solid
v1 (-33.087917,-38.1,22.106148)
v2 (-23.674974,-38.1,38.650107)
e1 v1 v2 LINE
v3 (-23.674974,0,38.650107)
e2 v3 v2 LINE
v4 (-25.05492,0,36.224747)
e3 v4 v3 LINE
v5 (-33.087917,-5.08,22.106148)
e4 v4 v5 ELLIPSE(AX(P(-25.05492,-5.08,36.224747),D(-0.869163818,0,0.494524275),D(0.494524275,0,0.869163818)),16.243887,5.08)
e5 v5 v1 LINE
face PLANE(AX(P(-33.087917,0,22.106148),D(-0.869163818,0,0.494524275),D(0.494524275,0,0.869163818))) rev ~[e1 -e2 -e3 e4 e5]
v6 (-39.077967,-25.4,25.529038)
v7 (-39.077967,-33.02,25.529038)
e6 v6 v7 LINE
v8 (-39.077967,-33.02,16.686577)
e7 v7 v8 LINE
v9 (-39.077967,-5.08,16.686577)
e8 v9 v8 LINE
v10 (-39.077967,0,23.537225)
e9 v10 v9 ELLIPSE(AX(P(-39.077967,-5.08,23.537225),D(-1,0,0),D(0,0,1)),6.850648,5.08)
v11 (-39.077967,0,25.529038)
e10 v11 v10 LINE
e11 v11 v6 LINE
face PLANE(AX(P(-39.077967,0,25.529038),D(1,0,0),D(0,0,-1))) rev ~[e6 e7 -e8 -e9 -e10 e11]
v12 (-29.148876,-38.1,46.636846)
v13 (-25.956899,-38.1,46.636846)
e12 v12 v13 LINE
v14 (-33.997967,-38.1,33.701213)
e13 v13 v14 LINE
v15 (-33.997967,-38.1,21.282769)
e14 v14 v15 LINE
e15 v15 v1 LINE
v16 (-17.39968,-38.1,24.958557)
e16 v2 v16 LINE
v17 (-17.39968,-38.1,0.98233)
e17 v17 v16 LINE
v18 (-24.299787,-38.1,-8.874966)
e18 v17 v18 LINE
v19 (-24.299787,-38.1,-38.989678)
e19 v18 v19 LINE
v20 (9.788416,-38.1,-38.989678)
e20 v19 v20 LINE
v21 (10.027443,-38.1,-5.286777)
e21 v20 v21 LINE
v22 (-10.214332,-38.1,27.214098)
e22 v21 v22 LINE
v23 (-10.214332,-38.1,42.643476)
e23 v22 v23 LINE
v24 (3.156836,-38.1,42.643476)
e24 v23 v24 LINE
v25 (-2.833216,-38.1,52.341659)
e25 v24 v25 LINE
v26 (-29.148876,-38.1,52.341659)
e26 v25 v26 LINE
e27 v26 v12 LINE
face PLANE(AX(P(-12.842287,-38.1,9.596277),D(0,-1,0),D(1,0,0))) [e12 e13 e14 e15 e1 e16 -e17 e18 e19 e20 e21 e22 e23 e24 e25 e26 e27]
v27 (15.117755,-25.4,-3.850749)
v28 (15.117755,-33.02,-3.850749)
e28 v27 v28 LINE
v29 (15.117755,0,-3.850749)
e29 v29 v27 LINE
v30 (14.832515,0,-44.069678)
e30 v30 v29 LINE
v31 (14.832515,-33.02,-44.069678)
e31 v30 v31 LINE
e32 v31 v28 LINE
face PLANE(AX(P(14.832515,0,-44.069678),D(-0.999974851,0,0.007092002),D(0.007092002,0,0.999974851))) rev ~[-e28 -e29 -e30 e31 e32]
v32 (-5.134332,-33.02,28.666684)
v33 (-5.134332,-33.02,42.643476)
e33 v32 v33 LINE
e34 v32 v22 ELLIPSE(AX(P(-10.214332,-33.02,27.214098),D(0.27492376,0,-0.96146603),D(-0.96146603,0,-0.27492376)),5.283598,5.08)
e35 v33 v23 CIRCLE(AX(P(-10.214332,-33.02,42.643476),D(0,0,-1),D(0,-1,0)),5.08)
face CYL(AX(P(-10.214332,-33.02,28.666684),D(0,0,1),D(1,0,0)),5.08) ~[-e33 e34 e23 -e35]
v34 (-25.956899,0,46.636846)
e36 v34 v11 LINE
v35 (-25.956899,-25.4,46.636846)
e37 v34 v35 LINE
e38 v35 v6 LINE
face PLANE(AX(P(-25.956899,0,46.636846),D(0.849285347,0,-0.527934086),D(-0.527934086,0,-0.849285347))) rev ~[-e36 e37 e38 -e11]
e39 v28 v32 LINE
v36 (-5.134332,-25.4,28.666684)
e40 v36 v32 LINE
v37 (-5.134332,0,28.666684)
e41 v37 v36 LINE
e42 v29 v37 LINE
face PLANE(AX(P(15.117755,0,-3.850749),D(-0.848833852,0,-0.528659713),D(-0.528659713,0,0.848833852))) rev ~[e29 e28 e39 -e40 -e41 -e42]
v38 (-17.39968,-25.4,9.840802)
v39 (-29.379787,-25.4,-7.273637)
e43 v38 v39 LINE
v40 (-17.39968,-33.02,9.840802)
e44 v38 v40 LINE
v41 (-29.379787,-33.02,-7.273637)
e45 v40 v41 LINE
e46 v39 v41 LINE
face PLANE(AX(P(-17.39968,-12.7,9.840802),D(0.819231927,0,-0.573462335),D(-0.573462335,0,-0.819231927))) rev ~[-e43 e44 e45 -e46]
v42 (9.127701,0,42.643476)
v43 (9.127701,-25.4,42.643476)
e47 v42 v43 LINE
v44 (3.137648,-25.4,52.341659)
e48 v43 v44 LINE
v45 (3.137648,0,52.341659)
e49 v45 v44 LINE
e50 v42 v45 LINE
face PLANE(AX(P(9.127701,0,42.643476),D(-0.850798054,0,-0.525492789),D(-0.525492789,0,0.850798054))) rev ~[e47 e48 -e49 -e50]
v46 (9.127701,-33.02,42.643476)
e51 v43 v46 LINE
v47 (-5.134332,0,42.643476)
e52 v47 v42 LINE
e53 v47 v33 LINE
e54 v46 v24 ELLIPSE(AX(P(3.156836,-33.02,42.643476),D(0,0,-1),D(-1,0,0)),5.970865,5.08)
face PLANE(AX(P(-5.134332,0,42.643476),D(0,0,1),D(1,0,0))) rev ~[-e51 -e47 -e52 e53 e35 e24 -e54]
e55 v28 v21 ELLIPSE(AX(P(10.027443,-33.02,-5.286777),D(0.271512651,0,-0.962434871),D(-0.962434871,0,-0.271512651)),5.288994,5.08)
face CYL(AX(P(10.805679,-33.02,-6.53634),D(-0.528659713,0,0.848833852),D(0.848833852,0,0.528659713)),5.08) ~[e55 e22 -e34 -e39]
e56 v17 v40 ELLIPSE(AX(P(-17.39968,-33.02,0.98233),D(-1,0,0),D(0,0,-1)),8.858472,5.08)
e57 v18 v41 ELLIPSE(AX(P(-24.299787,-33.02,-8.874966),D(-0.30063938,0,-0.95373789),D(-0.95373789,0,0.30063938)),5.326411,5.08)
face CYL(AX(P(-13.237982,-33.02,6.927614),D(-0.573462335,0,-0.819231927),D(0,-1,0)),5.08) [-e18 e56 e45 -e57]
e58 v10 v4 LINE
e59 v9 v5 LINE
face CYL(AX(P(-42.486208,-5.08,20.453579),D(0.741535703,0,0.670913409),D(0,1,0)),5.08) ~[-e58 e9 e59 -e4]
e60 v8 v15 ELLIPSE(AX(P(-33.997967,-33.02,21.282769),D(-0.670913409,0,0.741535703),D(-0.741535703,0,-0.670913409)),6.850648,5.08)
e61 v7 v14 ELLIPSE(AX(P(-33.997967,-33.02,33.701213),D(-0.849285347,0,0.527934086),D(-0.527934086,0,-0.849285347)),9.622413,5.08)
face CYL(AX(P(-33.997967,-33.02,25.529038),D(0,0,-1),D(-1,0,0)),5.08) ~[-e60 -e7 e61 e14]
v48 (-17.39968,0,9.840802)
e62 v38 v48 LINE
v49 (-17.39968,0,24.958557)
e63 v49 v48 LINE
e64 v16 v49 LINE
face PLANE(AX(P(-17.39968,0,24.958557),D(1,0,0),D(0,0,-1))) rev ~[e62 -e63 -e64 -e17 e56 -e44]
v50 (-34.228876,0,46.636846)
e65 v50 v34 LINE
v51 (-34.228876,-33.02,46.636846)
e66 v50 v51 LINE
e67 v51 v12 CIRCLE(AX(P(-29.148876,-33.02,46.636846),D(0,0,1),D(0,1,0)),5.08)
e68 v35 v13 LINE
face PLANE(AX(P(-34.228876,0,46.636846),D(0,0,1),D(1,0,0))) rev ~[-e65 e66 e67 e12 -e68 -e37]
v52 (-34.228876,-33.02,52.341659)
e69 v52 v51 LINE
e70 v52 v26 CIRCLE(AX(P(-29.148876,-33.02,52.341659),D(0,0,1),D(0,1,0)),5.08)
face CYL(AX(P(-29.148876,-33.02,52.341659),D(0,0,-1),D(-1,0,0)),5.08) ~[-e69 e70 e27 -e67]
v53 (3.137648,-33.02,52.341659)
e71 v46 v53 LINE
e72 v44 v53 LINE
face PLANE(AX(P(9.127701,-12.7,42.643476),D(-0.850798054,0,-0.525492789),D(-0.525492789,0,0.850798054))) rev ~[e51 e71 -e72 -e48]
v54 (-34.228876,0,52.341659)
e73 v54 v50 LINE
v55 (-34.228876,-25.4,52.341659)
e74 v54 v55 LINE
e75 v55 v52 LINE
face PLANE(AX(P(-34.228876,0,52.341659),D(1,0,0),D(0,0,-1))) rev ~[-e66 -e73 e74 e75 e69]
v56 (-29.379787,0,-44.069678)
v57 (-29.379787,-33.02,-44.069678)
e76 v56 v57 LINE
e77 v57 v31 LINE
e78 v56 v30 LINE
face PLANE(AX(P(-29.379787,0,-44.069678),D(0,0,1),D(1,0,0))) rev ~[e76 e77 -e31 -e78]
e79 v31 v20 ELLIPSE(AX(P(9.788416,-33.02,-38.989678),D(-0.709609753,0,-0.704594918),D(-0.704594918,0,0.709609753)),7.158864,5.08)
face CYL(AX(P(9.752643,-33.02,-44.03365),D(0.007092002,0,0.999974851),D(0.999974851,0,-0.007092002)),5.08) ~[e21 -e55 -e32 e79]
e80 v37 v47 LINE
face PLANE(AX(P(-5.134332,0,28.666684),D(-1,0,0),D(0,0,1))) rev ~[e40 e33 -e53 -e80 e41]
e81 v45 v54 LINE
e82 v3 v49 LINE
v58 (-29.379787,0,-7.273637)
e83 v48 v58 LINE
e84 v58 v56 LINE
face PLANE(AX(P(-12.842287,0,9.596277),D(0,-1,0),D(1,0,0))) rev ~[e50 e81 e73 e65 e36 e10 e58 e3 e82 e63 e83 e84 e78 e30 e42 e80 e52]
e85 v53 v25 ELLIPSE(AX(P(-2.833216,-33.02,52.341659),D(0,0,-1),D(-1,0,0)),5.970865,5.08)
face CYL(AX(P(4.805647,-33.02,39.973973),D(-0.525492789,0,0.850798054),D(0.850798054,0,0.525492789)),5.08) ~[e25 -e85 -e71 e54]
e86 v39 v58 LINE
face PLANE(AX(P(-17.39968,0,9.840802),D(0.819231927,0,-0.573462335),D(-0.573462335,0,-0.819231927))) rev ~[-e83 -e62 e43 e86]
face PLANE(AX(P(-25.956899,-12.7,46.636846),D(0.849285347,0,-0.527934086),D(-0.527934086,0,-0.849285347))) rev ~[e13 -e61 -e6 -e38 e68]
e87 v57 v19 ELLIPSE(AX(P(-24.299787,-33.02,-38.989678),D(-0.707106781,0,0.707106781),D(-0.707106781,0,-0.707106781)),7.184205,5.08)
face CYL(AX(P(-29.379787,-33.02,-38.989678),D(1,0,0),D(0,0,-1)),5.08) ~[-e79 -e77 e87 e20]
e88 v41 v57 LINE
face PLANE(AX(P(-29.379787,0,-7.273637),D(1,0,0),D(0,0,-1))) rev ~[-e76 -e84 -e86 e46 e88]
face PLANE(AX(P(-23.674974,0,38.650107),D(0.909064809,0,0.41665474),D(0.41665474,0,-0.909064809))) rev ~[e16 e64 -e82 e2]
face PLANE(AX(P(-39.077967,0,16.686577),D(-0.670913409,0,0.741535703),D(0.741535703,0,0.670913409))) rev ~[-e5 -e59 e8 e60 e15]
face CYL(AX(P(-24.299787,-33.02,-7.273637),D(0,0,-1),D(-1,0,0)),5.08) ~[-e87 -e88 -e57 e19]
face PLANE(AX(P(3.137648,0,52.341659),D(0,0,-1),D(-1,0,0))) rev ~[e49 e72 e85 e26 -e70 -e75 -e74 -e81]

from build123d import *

# Parameters (mm, degrees)
F1_DEPTH = 12.7
F2_DEPTH = 25.4
F3_R     = 5.08


with BuildPart() as f1:
    # F0 (on Front) → F1 (new body)
    with BuildSketch(Plane.XZ):
        Polygon((-29.3797869235, -7.2736367583), (-29.3797869235, -44.0696775913), (14.8325152695, -44.0696775913), (15.1177551597, -3.8507485297), (-5.1343315281, 28.666684404), (-5.1343315281, 42.6434762776), (9.1277007014, 42.6434762776), (3.1376483385, 52.341658622), (-34.2288762331, 52.341658622), (-34.2288762331, 46.6368459165), (-25.9568989277, 46.6368459165), (-39.0779674053, 25.529038161), (-39.0779674053, 16.6865773499), (-33.0879166722, 22.1061483026), (-23.674974218, 38.6501066387), (-17.3996798694, 24.958556518), (-17.3996798694, 9.8408022895), align=None)
    extrude(amount=F1_DEPTH)

    # F0 (on Front) + F1_face (on face) + F1_face1 (on face) → F2 (join)
    with BuildSketch(Plane.XZ):
        Polygon((-29.3797869235, -7.2736367583), (-29.3797869235, -44.0696775913), (14.8325152695, -44.0696775913), (15.1177551597, -3.8507485297), (-5.1343315281, 28.666684404), (-5.1343315281, 42.6434762776), (9.1277007014, 42.6434762776), (3.1376483385, 52.341658622), (-34.2288762331, 52.341658622), (-34.2288762331, 46.6368459165), (-25.9568989277, 46.6368459165), (-39.0779674053, 25.529038161), (-39.0779674053, 16.6865773499), (-33.0879166722, 22.1061483026), (-23.674974218, 38.6501066387), (-17.3996798694, 24.958556518), (-17.3996798694, 9.8408022895), align=None)
    with BuildSketch(Plane(origin=(-9.327897656, -12.7, -1.3317405801), x_dir=(1, 0, 0), z_dir=(0, -1, 0))):
        Polygon((18.4555983573, 43.9752168577), (12.4655459944, 53.6733992022), (-24.9009785771, 53.6733992022), (-24.9009785771, 47.9685864966), (-16.6290012717, 47.9685864966), (-29.7500697493, 26.8607787412), (-29.7500697493, 18.01831793), (-23.7600190162, 23.4378888827), (-14.347076562, 39.9818472188), (-8.0717822134, 26.2902970981), (-8.0717822134, 11.1725428697), (-20.0518892675, -5.9418961782), (-20.0518892675, -42.7379370112), (24.1604129255, -42.7379370112), (24.4456528157, -2.5190079495), (4.1935661279, 29.9984249842), (4.1935661279, 43.9752168577), align=None)
    with BuildSketch(Plane(origin=(-9.327897656, 0, -1.3317405801), x_dir=(1, 0, 0), z_dir=(0, 1, 0))):
        Polygon((12.4655459944, -53.6733992022), (18.4555983573, -43.9752168577), (4.1935661279, -43.9752168577), (4.1935661279, -29.9984249842), (24.4456528157, 2.5190079495), (24.1604129255, 42.7379370112), (-20.0518892675, 42.7379370112), (-20.0518892675, 5.9418961782), (-8.0717822134, -11.1725428697), (-8.0717822134, -26.2902970981), (-14.347076562, -39.9818472188), (-23.7600190162, -23.4378888827), (-29.7500697493, -18.01831793), (-29.7500697493, -26.8607787412), (-16.6290012717, -47.9685864966), (-24.9009785771, -47.9685864966), (-24.9009785771, -53.6733992022), align=None)
    extrude(amount=F2_DEPTH, dir=(0, -1, 0))

    # F3
    f3_edges = [f1.edges().sort_by_distance(p)[0] for p in [
        (-39.077967, -38.1, 21.107808),
        (-36.082942, 0, 19.396363),
        (6.132675, -38.1, 47.492567),
        (4.991712, -38.1, 12.407968),
        (-5.134332, -38.1, 35.65508),
        (14.975135, -38.1, -23.960213),
        (-34.228876, -38.1, 49.489252),
        (-23.389733, -38.1, 1.283583),
        (-29.379787, -38.1, -25.671657),
        (-7.273636, -38.1, -44.069678),
    ]]
    fillet(f3_edges, radius=F3_R)


solid = f1.part
